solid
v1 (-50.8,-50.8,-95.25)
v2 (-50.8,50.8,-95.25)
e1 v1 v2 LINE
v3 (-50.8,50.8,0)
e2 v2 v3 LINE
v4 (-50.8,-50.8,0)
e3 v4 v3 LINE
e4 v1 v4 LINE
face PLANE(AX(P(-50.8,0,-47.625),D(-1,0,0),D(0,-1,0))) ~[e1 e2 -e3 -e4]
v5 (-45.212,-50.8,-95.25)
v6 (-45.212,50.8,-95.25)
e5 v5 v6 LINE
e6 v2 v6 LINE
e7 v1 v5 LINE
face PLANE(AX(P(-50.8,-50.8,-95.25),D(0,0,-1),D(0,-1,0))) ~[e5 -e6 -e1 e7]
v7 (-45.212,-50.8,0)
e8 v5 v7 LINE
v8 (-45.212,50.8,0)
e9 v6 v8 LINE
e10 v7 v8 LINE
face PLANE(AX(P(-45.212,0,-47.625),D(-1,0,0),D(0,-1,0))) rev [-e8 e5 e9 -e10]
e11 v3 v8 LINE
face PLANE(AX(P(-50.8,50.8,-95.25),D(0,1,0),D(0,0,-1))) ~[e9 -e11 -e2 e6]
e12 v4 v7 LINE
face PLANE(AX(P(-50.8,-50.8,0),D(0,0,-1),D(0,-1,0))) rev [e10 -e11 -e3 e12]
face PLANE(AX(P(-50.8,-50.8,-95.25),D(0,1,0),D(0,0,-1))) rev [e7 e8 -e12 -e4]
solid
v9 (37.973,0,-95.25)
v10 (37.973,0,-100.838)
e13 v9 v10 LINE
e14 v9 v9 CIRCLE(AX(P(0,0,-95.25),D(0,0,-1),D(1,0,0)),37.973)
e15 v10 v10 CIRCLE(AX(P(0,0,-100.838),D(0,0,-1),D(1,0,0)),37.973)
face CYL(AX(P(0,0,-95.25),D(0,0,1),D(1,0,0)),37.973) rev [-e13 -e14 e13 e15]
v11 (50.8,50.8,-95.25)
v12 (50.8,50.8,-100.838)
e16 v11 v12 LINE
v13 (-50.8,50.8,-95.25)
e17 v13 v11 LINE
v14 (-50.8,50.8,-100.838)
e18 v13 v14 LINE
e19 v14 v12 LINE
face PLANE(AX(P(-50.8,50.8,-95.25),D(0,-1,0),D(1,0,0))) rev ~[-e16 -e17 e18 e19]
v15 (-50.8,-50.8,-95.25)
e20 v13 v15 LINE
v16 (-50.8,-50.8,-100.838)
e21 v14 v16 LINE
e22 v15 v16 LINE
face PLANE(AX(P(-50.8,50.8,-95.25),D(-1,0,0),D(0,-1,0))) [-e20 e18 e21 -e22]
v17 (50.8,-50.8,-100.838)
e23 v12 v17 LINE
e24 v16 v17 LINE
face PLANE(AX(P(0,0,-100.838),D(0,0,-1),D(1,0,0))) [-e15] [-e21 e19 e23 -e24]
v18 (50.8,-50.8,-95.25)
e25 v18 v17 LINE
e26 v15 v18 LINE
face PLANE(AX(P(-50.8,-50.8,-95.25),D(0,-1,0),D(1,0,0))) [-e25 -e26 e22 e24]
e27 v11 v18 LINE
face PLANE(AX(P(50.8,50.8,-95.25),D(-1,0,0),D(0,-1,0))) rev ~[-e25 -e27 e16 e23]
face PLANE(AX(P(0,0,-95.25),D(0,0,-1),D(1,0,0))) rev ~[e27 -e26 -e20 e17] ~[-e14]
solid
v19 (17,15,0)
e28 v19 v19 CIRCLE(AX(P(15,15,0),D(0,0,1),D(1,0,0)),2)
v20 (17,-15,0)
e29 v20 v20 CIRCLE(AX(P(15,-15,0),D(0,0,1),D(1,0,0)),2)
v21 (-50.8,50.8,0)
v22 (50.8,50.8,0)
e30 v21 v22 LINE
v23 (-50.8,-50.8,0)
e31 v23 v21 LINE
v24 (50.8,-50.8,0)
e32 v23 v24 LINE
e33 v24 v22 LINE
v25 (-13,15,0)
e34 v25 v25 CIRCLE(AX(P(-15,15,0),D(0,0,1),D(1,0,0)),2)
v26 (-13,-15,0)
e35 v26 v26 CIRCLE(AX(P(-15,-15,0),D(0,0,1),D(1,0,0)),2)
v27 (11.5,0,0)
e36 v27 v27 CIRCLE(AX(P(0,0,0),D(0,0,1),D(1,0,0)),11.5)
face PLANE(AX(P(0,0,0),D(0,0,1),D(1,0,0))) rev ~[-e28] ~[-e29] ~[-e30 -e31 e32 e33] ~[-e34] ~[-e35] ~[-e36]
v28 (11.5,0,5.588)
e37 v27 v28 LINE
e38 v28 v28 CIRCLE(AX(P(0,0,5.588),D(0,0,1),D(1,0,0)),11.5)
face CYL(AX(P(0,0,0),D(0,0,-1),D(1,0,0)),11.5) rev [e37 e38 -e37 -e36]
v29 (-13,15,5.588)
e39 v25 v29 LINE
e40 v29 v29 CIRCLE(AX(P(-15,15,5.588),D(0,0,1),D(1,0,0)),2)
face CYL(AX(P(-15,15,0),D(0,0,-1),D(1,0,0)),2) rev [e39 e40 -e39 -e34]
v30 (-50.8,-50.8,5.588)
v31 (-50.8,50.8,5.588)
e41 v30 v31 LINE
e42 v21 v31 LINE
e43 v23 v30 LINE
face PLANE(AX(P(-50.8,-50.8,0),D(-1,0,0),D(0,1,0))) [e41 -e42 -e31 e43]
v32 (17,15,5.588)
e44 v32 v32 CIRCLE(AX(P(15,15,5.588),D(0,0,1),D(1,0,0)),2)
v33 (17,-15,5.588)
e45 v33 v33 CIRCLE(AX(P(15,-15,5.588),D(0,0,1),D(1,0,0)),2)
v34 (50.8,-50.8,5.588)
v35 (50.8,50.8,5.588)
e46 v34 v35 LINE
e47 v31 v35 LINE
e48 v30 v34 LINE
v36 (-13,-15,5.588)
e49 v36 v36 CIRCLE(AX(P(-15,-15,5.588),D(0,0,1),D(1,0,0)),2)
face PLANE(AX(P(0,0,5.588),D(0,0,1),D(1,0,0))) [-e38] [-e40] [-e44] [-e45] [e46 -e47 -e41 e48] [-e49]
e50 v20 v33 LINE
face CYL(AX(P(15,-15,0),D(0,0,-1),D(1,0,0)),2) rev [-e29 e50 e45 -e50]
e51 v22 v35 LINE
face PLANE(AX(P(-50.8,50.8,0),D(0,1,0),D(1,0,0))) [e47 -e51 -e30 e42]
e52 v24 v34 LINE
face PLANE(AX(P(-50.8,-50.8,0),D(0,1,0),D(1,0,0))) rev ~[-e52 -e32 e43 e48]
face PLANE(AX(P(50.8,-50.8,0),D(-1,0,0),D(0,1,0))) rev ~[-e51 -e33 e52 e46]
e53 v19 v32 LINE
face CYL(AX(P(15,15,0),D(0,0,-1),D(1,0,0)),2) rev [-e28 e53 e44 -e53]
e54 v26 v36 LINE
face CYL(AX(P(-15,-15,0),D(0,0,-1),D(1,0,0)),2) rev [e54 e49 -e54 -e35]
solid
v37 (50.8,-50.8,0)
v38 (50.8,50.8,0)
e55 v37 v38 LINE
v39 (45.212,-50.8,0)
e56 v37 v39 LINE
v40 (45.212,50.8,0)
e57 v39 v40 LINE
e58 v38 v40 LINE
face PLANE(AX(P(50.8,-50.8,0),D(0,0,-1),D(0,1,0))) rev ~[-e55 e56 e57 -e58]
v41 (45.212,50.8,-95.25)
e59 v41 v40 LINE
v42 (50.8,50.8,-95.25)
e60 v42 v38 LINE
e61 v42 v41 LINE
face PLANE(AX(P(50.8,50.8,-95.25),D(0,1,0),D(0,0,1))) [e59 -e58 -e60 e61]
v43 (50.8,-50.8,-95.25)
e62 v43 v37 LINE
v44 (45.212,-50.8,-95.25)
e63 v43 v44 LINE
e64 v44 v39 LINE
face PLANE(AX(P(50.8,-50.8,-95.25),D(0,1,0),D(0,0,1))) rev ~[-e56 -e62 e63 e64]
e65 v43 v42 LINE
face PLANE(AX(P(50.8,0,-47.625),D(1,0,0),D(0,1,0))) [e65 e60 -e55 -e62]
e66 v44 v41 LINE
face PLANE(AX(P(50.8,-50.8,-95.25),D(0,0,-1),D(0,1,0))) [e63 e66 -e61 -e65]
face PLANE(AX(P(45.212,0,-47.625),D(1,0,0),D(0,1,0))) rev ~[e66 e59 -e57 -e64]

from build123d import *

# Parameters (mm, degrees)
F0_W     = 101.6
F0_H     = 101.6
F0_R     = 2
F0_R_2   = 11.5
F1_DEPTH = 5.588
F2_W     = 101.6
F2_H     = 95.25
F3_DEPTH = 5.588
F5_W     = 101.6
F5_H     = 101.6
F5_R     = 37.973
F6_DEPTH = 5.588


with BuildPart() as f1:
    # F0 (on Top) → F1 (new body)
    with BuildSketch(Plane.XY):
        Rectangle(F0_W, F0_H)
        with Locations((-15, -15)):
            Circle(F0_R, mode=Mode.SUBTRACT)
        Circle(F0_R_2, mode=Mode.SUBTRACT)
        with Locations((15, -15)):
            Circle(F0_R, mode=Mode.SUBTRACT)
        with Locations((-15, 15)):
            Circle(F0_R, mode=Mode.SUBTRACT)
        with Locations((15, 15)):
            Circle(F0_R, mode=Mode.SUBTRACT)
    extrude(amount=F1_DEPTH)


with BuildPart() as f3:
    # F2 (on face) → F3 (new body)
    with BuildSketch(Plane.YZ.offset(50.8)):
        with Locations((0, -47.625)):
            Rectangle(F2_W, F2_H)
    extrude(amount=-F3_DEPTH)


with BuildPart() as f4_1:
    # F4: instance of F3
    add(f3.part.mirror(Plane.YZ))


with BuildPart() as f6:
    # F5 (on face) → F6 (new body)
    with BuildSketch(Plane(origin=(0, 0, -95.25), x_dir=(1, 0, 0), z_dir=(0, 0, -1))):
        Rectangle(F5_W, F5_H)
        Circle(F5_R, mode=Mode.SUBTRACT)
    extrude(amount=F6_DEPTH)


solid = Compound([f1.part, f3.part, f4_1.part, f6.part])
